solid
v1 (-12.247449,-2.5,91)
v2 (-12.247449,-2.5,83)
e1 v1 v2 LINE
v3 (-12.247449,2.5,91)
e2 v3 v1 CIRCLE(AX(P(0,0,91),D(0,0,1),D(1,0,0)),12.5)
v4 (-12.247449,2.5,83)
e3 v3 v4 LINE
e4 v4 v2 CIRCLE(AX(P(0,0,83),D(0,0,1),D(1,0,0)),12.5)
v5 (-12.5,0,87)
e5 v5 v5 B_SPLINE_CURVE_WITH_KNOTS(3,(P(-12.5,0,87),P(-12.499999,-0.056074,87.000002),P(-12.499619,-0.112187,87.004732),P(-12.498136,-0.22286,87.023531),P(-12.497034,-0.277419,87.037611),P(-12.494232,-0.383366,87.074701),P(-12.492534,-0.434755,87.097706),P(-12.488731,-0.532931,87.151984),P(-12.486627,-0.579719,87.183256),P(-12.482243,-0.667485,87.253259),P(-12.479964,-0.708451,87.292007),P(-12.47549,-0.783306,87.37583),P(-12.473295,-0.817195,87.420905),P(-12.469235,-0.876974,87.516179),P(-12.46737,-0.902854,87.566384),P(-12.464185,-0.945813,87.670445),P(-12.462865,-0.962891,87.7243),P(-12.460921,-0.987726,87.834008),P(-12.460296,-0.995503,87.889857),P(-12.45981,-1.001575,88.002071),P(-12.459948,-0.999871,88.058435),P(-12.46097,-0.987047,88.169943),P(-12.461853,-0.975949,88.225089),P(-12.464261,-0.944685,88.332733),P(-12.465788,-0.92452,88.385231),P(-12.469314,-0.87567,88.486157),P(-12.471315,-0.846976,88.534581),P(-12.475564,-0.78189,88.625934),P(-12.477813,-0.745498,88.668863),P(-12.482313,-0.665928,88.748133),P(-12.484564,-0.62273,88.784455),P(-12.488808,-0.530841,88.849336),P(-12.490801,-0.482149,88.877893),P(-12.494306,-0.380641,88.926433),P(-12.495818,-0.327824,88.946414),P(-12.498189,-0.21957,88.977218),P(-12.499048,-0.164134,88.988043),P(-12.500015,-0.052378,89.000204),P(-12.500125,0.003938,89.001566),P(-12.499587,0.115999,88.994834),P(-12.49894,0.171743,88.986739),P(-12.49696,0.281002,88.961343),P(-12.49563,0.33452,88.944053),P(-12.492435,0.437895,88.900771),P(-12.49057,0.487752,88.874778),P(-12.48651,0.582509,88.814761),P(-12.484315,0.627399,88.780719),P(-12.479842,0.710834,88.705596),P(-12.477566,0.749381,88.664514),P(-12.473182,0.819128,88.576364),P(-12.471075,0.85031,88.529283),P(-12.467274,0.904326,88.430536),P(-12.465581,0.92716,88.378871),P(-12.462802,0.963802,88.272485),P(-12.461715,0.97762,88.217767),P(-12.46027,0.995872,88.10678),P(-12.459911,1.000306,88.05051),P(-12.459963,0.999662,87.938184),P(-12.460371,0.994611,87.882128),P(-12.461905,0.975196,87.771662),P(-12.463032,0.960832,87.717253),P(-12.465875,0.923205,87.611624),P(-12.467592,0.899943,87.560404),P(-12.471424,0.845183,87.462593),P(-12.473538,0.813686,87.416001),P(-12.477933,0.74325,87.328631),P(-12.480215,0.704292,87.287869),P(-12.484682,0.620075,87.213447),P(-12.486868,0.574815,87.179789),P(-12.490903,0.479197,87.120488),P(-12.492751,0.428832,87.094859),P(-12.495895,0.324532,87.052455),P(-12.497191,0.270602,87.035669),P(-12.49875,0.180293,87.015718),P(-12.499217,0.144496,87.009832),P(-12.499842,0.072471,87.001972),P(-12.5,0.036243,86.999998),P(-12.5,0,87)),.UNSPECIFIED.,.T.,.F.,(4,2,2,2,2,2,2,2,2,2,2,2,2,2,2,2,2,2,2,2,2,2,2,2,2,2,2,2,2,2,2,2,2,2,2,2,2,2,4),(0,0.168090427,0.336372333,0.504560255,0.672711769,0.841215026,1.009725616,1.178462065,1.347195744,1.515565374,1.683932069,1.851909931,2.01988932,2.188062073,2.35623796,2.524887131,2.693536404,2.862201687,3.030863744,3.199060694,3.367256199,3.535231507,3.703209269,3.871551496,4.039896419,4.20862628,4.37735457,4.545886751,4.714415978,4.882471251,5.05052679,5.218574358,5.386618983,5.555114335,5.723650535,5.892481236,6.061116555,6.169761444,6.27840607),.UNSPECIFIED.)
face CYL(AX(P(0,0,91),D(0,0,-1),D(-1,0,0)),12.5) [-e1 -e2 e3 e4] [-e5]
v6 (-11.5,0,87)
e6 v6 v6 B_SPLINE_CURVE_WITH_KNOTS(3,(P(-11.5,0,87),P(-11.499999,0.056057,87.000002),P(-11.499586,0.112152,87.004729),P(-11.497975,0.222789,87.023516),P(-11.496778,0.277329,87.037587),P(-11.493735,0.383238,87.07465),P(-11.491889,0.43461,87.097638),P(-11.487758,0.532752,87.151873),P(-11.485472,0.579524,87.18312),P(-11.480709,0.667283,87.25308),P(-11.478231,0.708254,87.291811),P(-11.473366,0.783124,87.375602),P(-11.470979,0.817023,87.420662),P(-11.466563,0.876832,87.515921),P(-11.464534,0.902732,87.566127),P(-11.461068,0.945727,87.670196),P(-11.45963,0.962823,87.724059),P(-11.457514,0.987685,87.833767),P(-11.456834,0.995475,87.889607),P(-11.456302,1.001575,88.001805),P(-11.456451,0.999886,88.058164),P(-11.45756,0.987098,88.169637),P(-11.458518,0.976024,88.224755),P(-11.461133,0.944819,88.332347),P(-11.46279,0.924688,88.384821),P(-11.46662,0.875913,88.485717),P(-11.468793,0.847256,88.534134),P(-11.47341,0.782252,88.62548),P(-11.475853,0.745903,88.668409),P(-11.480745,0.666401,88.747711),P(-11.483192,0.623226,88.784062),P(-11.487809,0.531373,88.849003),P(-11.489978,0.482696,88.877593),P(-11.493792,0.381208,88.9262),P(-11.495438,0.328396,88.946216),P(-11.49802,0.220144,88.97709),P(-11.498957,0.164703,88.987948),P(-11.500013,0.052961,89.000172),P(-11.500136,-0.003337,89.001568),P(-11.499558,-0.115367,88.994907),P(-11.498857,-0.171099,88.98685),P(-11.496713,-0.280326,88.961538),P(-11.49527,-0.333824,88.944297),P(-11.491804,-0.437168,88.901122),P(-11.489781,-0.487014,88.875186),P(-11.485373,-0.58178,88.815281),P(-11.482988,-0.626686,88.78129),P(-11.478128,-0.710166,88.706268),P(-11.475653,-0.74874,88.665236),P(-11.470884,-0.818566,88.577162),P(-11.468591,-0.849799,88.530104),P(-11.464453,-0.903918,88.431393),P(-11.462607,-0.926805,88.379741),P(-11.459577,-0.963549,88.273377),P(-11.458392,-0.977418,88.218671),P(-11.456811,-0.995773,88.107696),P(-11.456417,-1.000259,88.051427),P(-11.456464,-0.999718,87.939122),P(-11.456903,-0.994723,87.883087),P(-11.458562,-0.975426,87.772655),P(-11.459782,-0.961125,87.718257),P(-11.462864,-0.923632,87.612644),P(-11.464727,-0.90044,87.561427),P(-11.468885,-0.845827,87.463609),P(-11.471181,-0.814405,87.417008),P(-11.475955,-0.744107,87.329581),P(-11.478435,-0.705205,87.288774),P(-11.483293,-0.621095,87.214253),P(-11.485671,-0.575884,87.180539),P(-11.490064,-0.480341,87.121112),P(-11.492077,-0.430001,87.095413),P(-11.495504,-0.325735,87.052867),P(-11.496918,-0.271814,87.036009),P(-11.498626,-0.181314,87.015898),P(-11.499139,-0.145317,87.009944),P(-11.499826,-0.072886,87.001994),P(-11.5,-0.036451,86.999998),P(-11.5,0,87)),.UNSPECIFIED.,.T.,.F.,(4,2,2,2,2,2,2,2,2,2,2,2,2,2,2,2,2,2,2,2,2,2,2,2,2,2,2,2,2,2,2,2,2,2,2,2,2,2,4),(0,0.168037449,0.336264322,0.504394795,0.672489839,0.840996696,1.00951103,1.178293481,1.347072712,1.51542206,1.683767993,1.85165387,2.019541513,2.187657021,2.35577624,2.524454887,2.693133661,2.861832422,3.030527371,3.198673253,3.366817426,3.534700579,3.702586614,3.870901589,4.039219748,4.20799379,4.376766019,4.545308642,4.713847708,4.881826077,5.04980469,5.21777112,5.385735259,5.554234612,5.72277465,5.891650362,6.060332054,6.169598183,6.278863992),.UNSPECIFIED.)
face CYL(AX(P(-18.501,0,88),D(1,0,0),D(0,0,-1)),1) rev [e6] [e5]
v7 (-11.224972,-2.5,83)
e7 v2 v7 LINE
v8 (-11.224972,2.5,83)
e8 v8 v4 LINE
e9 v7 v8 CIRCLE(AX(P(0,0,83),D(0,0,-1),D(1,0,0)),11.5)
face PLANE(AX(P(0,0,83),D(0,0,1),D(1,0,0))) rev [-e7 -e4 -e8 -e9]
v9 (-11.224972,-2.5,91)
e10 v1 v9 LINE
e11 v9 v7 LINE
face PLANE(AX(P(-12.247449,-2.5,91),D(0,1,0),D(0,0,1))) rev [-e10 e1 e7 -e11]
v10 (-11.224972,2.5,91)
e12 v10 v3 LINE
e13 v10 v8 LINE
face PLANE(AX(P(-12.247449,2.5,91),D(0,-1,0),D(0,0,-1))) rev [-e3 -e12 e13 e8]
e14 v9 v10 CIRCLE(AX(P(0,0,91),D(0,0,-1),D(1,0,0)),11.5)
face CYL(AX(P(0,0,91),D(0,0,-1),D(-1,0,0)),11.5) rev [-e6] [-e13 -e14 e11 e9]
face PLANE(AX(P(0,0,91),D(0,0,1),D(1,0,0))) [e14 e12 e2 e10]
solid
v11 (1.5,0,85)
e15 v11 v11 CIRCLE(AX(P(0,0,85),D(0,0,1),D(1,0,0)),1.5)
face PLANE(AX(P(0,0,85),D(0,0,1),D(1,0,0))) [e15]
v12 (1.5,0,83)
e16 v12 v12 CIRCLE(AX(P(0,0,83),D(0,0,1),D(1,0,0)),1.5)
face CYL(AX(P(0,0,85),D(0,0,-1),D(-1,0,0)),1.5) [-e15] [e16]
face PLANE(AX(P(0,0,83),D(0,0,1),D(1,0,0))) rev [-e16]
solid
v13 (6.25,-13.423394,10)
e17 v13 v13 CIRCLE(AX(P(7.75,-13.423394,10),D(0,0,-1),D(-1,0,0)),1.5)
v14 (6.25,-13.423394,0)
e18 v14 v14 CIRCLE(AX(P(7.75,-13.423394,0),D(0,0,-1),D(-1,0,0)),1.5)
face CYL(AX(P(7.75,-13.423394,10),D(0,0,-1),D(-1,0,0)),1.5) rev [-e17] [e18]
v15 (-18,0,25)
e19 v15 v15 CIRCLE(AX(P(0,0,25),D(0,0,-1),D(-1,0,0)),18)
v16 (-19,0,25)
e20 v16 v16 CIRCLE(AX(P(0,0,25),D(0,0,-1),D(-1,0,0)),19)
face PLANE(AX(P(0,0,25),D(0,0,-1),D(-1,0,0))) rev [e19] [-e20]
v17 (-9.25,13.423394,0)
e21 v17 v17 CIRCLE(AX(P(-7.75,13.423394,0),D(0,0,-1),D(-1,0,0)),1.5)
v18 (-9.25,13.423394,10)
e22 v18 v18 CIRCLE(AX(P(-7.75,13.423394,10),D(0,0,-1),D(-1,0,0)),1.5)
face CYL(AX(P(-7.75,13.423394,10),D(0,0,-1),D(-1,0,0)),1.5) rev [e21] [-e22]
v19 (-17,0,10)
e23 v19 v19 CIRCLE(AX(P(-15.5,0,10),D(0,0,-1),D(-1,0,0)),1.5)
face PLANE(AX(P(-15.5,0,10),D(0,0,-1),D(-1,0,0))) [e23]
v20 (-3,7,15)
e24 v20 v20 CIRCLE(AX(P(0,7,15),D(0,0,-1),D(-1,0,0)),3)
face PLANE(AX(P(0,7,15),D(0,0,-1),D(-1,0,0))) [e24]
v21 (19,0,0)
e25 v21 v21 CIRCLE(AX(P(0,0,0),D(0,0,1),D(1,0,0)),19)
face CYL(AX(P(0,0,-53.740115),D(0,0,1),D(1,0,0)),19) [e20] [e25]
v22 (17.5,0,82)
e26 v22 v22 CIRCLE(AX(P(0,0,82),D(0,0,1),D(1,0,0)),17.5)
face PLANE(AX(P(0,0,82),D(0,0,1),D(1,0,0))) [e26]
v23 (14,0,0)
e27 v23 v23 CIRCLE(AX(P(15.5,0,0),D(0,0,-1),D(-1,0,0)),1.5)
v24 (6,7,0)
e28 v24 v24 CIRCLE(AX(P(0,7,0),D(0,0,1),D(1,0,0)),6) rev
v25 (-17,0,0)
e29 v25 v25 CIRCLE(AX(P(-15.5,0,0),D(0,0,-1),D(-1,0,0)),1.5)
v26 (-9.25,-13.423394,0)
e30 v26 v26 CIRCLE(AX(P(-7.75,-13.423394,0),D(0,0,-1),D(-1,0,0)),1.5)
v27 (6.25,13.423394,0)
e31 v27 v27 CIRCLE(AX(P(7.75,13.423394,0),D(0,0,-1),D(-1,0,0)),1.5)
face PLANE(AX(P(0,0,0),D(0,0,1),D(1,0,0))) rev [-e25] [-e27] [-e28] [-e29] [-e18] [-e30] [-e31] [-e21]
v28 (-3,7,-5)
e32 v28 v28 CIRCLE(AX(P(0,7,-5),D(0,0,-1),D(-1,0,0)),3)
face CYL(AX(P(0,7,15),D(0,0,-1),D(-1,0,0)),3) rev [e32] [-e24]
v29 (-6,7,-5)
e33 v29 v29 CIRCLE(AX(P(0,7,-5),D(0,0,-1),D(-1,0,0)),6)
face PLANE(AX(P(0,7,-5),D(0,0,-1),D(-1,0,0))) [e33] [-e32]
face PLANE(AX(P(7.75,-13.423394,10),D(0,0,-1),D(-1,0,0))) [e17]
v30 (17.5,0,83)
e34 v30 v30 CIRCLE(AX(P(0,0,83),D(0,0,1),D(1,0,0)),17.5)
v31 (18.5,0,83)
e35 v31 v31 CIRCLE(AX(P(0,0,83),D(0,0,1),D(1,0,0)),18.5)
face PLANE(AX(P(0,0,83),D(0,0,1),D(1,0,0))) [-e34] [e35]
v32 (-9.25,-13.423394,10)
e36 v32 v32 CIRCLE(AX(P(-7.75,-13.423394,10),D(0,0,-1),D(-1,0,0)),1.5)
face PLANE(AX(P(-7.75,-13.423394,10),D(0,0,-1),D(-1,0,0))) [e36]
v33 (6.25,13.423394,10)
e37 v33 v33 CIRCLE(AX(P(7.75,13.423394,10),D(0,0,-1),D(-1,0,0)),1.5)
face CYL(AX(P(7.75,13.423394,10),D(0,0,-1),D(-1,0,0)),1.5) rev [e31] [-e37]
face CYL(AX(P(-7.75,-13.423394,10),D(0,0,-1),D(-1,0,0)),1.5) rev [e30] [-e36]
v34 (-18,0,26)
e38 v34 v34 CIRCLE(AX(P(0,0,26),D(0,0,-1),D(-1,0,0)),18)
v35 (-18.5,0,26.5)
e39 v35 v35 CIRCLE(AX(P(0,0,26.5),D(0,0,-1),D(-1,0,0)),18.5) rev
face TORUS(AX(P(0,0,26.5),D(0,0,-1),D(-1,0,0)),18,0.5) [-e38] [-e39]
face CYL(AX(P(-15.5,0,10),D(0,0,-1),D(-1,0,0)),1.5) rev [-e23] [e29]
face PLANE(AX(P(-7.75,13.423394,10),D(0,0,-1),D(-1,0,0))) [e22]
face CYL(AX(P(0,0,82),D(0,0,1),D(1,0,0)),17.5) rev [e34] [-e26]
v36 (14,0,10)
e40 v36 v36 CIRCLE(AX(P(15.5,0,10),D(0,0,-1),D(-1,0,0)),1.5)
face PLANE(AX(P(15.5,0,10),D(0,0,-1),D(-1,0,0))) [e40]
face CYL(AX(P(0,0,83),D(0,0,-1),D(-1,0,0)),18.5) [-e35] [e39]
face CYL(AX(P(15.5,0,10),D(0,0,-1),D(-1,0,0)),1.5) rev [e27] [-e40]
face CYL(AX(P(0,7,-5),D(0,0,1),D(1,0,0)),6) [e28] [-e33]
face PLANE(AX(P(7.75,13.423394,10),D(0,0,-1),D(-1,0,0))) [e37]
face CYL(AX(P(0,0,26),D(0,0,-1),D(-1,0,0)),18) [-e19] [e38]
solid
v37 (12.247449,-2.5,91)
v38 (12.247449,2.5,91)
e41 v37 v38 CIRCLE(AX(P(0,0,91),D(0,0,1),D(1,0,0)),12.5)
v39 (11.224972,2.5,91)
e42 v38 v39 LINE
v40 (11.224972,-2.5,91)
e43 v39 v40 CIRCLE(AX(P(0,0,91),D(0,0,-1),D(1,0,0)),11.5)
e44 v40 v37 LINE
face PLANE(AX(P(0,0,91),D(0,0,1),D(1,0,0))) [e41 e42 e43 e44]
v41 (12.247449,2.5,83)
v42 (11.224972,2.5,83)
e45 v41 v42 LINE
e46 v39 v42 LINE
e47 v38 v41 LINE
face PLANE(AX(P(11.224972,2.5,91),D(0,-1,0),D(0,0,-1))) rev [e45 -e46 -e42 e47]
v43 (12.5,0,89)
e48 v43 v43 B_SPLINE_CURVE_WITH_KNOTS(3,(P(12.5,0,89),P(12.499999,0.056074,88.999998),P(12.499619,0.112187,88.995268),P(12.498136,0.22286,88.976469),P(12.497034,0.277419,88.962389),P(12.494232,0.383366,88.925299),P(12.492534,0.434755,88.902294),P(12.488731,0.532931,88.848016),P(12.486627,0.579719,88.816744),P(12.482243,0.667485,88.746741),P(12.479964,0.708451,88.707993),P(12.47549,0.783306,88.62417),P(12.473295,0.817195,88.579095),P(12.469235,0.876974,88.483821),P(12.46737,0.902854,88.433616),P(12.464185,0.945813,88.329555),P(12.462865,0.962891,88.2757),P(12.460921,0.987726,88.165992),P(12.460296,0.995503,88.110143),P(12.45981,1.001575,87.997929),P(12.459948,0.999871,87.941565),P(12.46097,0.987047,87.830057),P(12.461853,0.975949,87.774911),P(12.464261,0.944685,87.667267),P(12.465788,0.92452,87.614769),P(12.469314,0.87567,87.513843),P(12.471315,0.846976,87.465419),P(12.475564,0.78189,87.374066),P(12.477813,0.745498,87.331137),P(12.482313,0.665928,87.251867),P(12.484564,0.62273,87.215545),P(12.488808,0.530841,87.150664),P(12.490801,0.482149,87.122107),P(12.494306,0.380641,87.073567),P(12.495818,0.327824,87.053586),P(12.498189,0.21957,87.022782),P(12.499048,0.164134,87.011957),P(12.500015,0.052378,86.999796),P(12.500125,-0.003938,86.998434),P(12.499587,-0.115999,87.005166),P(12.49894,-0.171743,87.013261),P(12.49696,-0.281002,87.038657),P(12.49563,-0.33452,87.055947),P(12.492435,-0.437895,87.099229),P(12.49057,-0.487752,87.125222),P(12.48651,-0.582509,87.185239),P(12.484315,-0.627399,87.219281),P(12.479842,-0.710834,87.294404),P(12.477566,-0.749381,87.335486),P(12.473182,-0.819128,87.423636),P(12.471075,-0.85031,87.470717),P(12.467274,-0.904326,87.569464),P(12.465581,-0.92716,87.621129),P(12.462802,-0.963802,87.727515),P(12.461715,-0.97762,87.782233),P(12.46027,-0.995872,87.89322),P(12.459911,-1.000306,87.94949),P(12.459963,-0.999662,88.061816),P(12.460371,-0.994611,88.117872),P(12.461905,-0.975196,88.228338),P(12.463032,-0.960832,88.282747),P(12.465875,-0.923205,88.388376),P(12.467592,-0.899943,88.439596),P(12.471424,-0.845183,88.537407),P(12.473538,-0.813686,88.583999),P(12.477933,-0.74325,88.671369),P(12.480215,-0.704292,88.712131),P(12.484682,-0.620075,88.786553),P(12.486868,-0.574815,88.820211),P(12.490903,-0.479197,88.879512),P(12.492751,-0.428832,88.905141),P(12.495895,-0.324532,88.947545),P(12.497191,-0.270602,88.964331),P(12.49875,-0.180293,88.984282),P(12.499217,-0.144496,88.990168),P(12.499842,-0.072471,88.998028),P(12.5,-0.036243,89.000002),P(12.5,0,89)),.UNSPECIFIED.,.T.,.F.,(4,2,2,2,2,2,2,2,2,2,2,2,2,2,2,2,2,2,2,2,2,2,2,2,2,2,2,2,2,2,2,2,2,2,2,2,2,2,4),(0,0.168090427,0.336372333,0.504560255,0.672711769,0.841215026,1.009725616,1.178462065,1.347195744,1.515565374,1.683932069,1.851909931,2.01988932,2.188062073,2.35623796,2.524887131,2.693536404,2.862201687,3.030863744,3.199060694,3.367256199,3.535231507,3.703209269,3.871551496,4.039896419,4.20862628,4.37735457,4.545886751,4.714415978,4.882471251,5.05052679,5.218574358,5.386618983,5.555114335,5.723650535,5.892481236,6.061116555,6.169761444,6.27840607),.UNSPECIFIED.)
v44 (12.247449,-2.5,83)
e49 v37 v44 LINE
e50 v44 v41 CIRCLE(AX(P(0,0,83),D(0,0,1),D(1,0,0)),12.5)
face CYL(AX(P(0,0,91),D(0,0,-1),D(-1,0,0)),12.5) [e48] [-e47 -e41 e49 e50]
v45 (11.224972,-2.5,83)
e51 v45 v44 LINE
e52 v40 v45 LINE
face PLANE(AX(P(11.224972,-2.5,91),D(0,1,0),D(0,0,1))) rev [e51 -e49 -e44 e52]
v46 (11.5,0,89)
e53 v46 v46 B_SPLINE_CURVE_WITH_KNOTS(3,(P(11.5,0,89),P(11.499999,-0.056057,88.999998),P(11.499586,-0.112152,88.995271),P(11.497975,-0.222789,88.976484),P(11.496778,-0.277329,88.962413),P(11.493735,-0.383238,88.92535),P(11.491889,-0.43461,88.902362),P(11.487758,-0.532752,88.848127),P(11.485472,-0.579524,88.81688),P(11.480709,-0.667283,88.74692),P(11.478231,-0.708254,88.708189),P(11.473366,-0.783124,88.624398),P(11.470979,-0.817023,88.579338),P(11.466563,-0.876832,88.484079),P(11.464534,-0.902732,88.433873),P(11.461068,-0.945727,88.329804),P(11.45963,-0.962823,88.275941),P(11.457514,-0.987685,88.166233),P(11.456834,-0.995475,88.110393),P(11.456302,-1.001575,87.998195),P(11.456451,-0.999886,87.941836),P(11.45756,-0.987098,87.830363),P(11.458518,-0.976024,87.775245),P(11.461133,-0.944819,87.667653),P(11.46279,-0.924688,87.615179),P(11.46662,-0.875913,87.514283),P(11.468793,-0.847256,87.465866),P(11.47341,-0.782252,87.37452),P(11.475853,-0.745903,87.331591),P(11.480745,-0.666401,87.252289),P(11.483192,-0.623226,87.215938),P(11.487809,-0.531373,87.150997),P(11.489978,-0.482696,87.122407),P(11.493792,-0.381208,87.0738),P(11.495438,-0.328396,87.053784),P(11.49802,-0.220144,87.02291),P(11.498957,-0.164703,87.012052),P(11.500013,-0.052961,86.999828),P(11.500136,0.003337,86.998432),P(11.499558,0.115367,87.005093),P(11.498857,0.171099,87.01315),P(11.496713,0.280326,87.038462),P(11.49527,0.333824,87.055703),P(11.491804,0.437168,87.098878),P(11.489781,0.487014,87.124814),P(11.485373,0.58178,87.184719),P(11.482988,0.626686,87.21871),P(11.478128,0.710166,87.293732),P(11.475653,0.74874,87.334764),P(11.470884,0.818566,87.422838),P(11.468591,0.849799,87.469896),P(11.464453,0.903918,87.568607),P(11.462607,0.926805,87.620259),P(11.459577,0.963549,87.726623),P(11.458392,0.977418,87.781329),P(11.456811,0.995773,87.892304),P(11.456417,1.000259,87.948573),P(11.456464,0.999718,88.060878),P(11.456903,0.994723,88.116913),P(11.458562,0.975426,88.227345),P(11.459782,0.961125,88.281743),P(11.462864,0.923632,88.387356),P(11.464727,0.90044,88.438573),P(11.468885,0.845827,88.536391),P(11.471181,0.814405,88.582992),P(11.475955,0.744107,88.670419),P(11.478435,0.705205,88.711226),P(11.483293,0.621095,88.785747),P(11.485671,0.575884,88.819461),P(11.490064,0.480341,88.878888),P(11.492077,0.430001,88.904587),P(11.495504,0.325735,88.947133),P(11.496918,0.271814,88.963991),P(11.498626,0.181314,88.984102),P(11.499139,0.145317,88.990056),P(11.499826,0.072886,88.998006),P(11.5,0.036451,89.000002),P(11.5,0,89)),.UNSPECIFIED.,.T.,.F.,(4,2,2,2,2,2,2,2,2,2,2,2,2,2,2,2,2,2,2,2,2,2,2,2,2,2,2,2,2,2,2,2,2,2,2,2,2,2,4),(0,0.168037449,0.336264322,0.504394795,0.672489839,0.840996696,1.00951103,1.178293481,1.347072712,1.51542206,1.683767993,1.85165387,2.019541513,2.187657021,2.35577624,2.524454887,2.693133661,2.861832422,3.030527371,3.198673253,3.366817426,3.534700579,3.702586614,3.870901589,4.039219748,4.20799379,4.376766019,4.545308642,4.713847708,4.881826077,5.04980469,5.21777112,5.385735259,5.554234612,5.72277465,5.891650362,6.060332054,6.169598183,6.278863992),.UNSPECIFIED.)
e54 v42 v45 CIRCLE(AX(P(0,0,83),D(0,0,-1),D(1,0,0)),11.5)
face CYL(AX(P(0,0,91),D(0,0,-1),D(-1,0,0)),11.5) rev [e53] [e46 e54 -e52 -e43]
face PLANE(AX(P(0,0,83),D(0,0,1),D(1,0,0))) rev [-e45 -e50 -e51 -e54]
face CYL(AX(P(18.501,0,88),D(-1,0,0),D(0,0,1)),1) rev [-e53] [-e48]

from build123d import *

# Parameters (mm, degrees)
SKETCH_1_R                      = 18.5
EXTRUDE_1_DEPTH                 = 83
SKETCH_2_R                      = 1.5
EXTRUDE_2_DEPTH                 = 2
EXTRUDE_3_DEPTH                 = 8
CUT_EXTRUDE_2_REACH             = 96.686
SKETCH_6_R                      = 1
CUT_EXTRUDE_2_DIRECTION_2_REACH = 96.686
SKETCH_7_R                      = 1.5
CUT_EXTRUDE_3_DEPTH             = 10
SKETCH_8_R                      = 6
EXTRUDE_4_DEPTH                 = 5
SKETCH_10_R                     = 3
CUT_EXTRUDE_4_DEPTH             = 20
SKETCH_11_R                     = 18.5
SKETCH_11_R_2                   = 18
CUT_EXTRUDE_5_DEPTH             = 1
EXTRUDE_START                   = 25
SKETCH_12_R                     = 19
SKETCH_12_R_2                   = 18.5
EXTRUDE_5_DEPTH                 = 25
FILLET_1_R                      = 0.5
SKETCH_13_R                     = 17.5
CUT_EXTRUDE_6_DEPTH             = 1


with BuildPart() as part:
    # 草图1 → 凸台-拉伸1 (new body)
    with BuildSketch(Plane.XY):
        Circle(SKETCH_1_R)
    extrude(amount=EXTRUDE_1_DEPTH)

    # 草图2 → 凸台-拉伸2 (add)
    with BuildSketch(Plane.XY.offset(83)):
        Circle(SKETCH_2_R)
    extrude(amount=EXTRUDE_2_DEPTH)

    # 草图4 → 凸台-拉伸3 (add)
    with BuildSketch(Plane.XY.offset(83)):
        with BuildLine():
            Line((-12.247448714, 2.5), (-11.22497216, 2.5))
            ThreePointArc((-11.22497216, 2.5), (-11.5, 0), (-11.22497216, -2.5))
            Line((-11.22497216, -2.5), (-12.247448714, -2.5))
            ThreePointArc((-12.247448714, -2.5), (-12.5, 0), (-12.247448714, 2.5))
        make_face()
        with BuildLine():
            Line((11.22497216, 2.5), (12.247448714, 2.5))
            ThreePointArc((12.247448714, 2.5), (12.5, 0), (12.247448714, -2.5))
            Line((12.247448714, -2.5), (11.22497216, -2.5))
            ThreePointArc((11.22497216, -2.5), (11.5, 0), (11.22497216, 2.5))
        make_face()
    extrude(amount=EXTRUDE_3_DEPTH)

    # 草图6 → 切除-拉伸2 (cut, up to next)
    with BuildSketch(Plane(origin=(0, 0, 0), x_dir=(0, 0, -1), z_dir=(1, 0, 0)), mode=Mode.PRIVATE) as cut_extrude_2_sk1:
        with Locations(Location((-88, 0, 0), (0, 0, 180))):
            Circle(SKETCH_6_R)
    cut_extrude_2_tool1 = extrude(cut_extrude_2_sk1.sketch, amount=-CUT_EXTRUDE_2_REACH, mode=Mode.PRIVATE) & part.part
    add(cut_extrude_2_tool1.solids().sort_by_distance((0, 0, 88))[0], mode=Mode.SUBTRACT)

    # 草图6 → 切除-拉伸2 direction 2 (cut, up to next)
    with BuildSketch(Plane(origin=(0, 0, 0), x_dir=(0, 0, -1), z_dir=(1, 0, 0)), mode=Mode.PRIVATE) as cut_extrude_2_direction_2_sk1:
        with Locations(Location((-88, 0, 0), (0, 0, 180))):
            Circle(SKETCH_6_R)
    cut_extrude_2_direction_2_tool1 = extrude(cut_extrude_2_direction_2_sk1.sketch, amount=CUT_EXTRUDE_2_DIRECTION_2_REACH, mode=Mode.PRIVATE) & part.part
    add(cut_extrude_2_direction_2_tool1.solids().sort_by_distance((0, 0, 88))[0], mode=Mode.SUBTRACT)

    # 草图7 → 切除-拉伸3 (cut)
    with BuildSketch(Plane(origin=(0, 0, 0), x_dir=(-1, 0, 0), z_dir=(0, 0, -1))):
        with Locations((15.5, 0)):
            Circle(SKETCH_7_R)
        with Locations((7.75, -13.423393759)):
            Circle(SKETCH_7_R)
        with Locations((-7.75, -13.423393759)):
            Circle(SKETCH_7_R)
        with Locations((-15.5, 0)):
            Circle(SKETCH_7_R)
        with Locations((-7.75, 13.423393759)):
            Circle(SKETCH_7_R)
        with Locations((7.75, 13.423393759)):
            Circle(SKETCH_7_R)
    extrude(amount=-CUT_EXTRUDE_3_DEPTH, mode=Mode.SUBTRACT)

    # 草图8 → 凸台-拉伸4 (add)
    with BuildSketch(Plane(origin=(0, 0, 0), x_dir=(-1, 0, 0), z_dir=(0, 0, -1))):
        with Locations(Location((0, 7, 0), (0, 0, 180))):
            Circle(SKETCH_8_R)
    extrude(amount=EXTRUDE_4_DEPTH)

    # 草图10 → 切除-拉伸4 (cut)
    with BuildSketch(Plane(origin=(0, 0, -5), x_dir=(-1, 0, 0), z_dir=(0, 0, -1))):
        with Locations((0, 7)):
            Circle(SKETCH_10_R)
    extrude(amount=-CUT_EXTRUDE_4_DEPTH, mode=Mode.SUBTRACT)

    # 草图11 → 切除-拉伸5 (cut)
    with BuildSketch(Plane(origin=(0, 0, 25), x_dir=(-1, 0, 0), z_dir=(0, 0, -1))):
        Circle(SKETCH_11_R)
        Circle(SKETCH_11_R_2, mode=Mode.SUBTRACT)
    extrude(amount=-CUT_EXTRUDE_5_DEPTH, mode=Mode.SUBTRACT)

    # 草图12 → 凸台-拉伸5 (add)
    with BuildSketch(Plane(origin=(0, 0, 25), x_dir=(-1, 0, 0), z_dir=(0, 0, -1)).offset(EXTRUDE_START)):
        with Locations(Location((0, 0, 0), (0, 0, 180))):
            Circle(SKETCH_12_R)
        Circle(SKETCH_12_R_2, mode=Mode.SUBTRACT)
    extrude(amount=-EXTRUDE_5_DEPTH)

    # 圆角1
    fillet_1_edges = [part.edges().sort_by_distance(p)[0] for p in [
        (-18.5, 0, 26),
    ]]
    fillet(fillet_1_edges, radius=FILLET_1_R - 0.0001)  # a hair under: the kernel refuses the full size

    # 草图13 → 切除-拉伸6 (cut)
    with BuildSketch(Plane.XY.offset(83)):
        Circle(SKETCH_13_R)
    extrude(amount=-CUT_EXTRUDE_6_DEPTH, mode=Mode.SUBTRACT)


with BuildPart() as cut_extrude_6_piece_1:
    # of the separate pieces the step leaves, piece 1, a body of its own (cut_extrude_6_pieces)
    add(part.part.solids().sort_by_distance((18.0001, 0, 26))[0])


with BuildPart() as cut_extrude_6_piece_2:
    # of the separate pieces the step leaves, piece 2, a body of its own (cut_extrude_6_pieces)
    add(part.part.solids().sort_by_distance((-11.22497216, 2.5, 83))[0])


with BuildPart() as cut_extrude_6_piece_3:
    # of the separate pieces the step leaves, piece 3, a body of its own (cut_extrude_6_pieces)
    add(part.part.solids().sort_by_distance((11.22497216, -2.5, 83))[0])


with BuildPart() as cut_extrude_6_piece_4:
    # of the separate pieces the step leaves, piece 4, a body of its own (cut_extrude_6_pieces)
    add(part.part.solids().sort_by_distance((1.5, 0, 83))[0])


solid = Compound([cut_extrude_6_piece_1.part, cut_extrude_6_piece_2.part, cut_extrude_6_piece_3.part, cut_extrude_6_piece_4.part])
